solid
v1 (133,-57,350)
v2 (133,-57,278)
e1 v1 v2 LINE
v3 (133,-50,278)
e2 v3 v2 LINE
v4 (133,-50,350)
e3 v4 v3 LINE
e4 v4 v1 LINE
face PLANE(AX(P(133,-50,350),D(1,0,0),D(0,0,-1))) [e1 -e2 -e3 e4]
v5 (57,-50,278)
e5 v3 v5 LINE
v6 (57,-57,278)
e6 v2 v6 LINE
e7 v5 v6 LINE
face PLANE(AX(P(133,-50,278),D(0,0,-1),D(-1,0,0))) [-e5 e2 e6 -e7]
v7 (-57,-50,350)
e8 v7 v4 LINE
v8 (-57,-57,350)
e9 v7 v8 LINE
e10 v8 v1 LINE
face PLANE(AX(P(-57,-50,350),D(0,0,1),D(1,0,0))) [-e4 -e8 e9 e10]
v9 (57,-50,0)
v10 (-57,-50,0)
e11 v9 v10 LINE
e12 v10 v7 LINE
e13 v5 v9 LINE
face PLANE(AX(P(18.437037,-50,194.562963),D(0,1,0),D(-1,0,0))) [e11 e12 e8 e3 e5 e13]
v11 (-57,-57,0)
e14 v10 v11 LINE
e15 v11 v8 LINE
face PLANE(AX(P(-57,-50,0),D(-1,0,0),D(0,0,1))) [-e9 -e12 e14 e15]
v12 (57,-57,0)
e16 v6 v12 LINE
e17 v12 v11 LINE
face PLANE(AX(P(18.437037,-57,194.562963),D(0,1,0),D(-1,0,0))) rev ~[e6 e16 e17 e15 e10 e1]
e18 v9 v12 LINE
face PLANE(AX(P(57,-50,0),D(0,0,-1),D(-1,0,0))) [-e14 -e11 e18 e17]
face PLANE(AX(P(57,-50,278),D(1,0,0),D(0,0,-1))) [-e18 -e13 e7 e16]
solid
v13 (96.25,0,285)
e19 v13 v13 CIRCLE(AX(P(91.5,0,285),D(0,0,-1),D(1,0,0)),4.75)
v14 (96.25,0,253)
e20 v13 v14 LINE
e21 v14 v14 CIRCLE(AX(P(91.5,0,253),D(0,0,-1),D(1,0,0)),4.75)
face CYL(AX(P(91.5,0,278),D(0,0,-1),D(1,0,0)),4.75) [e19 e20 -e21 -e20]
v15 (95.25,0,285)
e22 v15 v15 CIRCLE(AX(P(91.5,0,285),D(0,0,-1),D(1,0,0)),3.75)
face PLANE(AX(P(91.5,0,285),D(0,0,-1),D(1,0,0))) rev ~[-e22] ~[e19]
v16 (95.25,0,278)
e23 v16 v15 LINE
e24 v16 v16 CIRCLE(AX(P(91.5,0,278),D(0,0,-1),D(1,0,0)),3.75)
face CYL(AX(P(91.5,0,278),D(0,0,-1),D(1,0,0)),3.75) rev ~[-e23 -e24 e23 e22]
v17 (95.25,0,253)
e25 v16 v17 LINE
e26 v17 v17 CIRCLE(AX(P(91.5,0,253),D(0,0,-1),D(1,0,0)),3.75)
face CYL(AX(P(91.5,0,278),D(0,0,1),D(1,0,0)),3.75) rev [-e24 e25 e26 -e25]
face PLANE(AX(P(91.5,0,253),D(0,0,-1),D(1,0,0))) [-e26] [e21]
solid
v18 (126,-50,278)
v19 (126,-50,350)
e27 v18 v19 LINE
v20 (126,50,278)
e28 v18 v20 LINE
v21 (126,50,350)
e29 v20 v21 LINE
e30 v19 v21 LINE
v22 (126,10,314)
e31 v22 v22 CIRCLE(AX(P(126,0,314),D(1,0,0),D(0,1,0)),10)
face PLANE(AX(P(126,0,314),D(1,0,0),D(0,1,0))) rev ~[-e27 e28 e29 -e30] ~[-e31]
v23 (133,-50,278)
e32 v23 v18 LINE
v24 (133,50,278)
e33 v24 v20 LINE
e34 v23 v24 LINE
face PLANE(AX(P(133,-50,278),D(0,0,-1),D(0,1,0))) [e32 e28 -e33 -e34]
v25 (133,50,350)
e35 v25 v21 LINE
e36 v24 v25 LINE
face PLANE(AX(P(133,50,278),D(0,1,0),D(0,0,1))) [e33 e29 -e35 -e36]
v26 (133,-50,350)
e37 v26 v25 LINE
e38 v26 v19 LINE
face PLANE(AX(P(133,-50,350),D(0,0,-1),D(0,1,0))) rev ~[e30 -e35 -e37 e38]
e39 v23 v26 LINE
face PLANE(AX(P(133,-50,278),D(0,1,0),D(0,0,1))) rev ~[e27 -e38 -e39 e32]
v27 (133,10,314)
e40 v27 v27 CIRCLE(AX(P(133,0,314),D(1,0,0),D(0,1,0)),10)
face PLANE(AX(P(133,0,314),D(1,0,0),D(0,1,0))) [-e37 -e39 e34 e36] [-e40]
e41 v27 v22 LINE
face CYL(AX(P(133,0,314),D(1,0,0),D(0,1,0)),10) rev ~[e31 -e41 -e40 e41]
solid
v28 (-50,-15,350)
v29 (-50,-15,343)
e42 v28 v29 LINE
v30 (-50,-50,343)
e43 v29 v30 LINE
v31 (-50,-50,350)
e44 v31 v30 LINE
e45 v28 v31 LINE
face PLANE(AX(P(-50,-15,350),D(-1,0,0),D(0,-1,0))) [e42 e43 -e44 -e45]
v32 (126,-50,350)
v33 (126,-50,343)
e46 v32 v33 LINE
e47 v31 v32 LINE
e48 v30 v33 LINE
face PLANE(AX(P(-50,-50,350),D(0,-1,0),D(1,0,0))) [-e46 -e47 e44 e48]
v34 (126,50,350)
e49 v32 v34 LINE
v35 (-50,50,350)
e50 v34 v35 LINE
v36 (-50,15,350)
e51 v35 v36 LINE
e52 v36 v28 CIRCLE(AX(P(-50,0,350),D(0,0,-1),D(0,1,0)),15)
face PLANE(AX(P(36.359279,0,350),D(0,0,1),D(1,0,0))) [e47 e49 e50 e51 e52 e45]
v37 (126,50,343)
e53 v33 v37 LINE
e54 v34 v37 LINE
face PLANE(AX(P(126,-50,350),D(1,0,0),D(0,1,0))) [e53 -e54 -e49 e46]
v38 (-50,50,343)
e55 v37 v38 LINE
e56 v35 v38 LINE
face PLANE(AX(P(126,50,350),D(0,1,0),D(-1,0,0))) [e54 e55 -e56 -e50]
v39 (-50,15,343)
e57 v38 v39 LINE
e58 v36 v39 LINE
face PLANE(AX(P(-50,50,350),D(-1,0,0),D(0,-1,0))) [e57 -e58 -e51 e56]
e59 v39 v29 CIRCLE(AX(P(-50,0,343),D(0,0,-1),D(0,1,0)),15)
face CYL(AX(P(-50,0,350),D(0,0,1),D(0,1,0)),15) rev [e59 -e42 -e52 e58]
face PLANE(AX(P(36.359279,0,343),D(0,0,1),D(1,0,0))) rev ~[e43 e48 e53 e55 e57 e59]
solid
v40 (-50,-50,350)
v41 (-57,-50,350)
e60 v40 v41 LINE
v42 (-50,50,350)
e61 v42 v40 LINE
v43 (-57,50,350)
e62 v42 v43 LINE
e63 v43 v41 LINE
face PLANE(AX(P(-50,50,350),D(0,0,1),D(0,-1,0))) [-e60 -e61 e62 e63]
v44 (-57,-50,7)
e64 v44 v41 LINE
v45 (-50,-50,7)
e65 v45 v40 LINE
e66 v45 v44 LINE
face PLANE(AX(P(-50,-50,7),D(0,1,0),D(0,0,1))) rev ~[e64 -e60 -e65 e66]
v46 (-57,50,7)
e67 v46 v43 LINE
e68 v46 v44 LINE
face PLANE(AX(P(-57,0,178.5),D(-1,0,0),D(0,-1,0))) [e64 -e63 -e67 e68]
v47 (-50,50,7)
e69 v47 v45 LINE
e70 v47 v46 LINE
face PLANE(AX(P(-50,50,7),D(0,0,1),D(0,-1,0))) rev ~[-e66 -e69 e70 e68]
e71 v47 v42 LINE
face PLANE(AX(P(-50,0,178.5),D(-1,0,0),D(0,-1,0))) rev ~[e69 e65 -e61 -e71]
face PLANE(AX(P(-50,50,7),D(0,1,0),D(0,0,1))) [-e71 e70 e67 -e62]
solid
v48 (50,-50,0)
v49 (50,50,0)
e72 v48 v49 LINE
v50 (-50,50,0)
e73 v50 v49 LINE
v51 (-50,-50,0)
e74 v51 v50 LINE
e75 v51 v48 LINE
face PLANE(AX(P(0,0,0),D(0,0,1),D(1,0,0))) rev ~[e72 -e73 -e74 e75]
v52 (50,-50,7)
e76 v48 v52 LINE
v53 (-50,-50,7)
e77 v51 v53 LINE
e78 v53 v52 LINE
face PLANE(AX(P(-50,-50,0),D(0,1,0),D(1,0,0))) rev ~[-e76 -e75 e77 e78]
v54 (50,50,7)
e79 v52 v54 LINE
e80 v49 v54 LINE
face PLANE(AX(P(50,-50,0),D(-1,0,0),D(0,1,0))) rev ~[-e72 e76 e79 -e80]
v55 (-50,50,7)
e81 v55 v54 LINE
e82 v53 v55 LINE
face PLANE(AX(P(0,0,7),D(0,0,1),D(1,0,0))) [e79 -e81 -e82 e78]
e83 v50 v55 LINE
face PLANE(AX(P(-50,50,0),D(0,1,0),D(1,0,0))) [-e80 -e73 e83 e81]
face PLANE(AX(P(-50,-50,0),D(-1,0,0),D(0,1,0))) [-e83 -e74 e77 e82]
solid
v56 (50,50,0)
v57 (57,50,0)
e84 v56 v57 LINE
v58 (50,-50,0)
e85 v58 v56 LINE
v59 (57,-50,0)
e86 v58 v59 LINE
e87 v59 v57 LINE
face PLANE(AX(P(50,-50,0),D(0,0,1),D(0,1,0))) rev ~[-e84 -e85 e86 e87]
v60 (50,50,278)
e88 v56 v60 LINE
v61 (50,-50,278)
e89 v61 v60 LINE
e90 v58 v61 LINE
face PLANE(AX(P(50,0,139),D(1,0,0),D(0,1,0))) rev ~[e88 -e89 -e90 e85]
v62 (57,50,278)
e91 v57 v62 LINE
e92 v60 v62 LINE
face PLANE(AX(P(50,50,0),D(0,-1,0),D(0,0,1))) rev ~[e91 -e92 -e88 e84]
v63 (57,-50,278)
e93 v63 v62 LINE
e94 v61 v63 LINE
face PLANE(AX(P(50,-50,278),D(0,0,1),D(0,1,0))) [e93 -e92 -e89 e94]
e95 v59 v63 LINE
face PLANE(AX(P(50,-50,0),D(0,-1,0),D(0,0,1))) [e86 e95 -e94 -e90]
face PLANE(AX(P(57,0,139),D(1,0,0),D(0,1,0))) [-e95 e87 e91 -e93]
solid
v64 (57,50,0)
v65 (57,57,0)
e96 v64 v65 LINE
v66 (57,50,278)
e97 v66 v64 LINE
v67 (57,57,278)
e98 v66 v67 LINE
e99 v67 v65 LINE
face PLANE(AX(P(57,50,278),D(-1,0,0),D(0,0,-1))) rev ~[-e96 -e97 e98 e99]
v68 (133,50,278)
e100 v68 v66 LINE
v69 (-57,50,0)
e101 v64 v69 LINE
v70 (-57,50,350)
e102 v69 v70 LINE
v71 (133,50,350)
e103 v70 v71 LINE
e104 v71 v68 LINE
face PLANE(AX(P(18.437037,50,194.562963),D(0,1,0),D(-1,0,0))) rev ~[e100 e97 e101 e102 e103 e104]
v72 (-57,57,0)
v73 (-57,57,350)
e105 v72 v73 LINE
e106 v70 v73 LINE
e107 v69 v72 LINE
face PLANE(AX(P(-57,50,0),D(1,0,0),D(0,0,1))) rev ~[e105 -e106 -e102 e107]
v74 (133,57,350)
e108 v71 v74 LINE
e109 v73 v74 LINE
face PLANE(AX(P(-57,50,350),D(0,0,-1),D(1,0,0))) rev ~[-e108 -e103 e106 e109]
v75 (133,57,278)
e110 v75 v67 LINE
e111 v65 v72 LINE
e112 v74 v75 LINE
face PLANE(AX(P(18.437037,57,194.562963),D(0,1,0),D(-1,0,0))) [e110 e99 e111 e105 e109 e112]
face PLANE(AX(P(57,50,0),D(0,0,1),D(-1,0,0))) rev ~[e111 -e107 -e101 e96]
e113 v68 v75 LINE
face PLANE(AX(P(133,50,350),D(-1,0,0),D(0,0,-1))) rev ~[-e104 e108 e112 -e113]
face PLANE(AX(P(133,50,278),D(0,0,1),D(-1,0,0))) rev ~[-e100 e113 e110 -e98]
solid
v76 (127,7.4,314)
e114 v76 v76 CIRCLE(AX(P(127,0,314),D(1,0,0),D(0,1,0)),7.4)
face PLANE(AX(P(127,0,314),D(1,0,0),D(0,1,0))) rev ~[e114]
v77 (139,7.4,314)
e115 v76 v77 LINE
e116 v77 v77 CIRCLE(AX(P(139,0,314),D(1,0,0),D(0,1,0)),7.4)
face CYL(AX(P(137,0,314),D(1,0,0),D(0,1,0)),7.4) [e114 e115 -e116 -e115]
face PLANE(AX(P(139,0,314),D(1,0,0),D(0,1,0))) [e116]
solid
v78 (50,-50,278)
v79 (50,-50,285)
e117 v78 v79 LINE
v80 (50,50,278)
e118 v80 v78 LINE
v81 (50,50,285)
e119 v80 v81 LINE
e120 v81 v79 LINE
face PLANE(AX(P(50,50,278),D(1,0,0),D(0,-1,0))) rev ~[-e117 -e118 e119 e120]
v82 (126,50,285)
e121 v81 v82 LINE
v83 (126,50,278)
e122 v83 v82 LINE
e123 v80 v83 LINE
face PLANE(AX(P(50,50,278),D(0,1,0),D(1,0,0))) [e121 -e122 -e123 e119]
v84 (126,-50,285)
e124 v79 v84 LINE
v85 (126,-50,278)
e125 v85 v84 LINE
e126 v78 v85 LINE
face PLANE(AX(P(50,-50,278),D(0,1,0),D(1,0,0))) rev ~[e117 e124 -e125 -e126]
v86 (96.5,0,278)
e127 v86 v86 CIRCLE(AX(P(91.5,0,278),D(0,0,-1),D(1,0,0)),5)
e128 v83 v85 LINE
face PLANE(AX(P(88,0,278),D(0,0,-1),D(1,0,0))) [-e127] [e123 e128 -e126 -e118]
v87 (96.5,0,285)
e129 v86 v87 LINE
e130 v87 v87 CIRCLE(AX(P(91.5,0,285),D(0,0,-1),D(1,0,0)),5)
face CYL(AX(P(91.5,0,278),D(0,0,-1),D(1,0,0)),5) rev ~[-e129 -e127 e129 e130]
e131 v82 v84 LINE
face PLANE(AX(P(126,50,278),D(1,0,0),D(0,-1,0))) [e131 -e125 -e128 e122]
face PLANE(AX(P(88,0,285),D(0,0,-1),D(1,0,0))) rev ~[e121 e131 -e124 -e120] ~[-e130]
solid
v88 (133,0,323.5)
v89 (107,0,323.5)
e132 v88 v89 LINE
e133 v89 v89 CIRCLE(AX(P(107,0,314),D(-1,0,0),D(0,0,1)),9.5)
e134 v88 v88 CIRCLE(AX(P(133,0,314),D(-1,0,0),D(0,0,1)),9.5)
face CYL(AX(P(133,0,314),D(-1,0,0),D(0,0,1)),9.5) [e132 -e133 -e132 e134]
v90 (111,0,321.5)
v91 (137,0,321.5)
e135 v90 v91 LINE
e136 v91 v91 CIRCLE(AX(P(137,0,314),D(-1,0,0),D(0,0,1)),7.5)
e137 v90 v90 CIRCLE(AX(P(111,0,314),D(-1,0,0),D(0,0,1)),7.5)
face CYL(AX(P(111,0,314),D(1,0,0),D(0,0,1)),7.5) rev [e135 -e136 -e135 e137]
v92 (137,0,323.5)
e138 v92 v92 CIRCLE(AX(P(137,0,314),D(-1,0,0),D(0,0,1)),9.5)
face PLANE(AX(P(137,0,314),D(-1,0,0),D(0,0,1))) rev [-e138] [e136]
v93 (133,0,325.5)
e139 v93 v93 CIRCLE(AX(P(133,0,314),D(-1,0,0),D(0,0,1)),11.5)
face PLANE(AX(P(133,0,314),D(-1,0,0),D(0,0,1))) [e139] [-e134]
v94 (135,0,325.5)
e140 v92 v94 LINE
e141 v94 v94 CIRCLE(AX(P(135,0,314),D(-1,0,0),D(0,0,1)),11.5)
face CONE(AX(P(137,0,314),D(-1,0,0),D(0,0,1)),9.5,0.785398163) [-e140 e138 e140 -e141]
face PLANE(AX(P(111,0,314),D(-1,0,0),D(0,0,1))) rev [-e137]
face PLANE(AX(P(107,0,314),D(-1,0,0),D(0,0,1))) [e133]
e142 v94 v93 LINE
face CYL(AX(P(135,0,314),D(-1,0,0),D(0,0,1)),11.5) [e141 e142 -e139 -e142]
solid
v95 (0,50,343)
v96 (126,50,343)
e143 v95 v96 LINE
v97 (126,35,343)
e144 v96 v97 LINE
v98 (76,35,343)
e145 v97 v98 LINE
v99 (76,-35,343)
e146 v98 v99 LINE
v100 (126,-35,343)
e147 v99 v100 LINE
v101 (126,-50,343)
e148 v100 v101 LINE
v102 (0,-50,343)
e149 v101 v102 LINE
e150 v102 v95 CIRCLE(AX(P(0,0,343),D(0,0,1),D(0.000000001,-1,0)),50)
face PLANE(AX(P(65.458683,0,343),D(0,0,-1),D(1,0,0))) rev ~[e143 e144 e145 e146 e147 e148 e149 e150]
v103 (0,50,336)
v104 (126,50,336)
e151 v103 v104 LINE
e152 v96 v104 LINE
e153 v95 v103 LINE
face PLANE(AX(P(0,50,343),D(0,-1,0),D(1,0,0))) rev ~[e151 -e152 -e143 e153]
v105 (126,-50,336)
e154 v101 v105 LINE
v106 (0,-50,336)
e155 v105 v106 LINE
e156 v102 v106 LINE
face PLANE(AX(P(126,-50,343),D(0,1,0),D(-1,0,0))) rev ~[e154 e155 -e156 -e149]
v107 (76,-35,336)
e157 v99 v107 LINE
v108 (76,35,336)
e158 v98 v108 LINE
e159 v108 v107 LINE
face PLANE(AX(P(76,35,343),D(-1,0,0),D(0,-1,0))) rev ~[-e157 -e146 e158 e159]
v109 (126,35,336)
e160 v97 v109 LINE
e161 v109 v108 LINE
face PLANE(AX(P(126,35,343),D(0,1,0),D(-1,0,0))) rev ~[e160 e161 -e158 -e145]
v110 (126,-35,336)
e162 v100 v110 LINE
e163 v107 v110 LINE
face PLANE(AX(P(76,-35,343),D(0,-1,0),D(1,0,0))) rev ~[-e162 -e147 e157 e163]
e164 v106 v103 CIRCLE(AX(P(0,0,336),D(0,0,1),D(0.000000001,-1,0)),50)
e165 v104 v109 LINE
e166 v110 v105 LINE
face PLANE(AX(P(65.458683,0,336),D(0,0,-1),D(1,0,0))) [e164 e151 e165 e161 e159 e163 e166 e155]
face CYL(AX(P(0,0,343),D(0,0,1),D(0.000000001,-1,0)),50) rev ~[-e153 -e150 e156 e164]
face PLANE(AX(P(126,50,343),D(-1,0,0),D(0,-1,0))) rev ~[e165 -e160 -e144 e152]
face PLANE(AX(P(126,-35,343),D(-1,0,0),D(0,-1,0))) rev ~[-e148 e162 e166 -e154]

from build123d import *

# Parameters (mm, degrees)
F0_W           = 100
F0_H           = 100
F1_DEPTH       = 7
F3_DEPTH       = 7
F4_START       = -100
F4_DEPTH       = 7
F5_W           = 100
F5_H           = 278
F6_DEPTH       = 7
F7_W           = 100
F7_H           = 343
F8_DEPTH       = 7
F9_W           = 100
F9_H           = 72
F9_R           = 10
F10_DEPTH      = 7
F12_DEPTH      = 7
F13_W          = 76
F13_H          = 100
F13_R          = 5
F14_DEPTH      = 7
F17_R          = 7.4
F18_DEPTH      = 2
F18_DEPTH_BACK = 10
F19_R          = 4.75
F19_R_2        = 3.75
F20_DEPTH      = 25
F20_DEPTH_BACK = 7
F22_DEPTH      = 7


with BuildPart() as f1:
    # F0 (on Top) → F1 (new body)
    with BuildSketch(Plane.XY):
        Rectangle(F0_W, F0_H)
    extrude(amount=F1_DEPTH)


with BuildPart() as f3:
    # F2 (on face) → F3 (new body)
    with BuildSketch(Plane(origin=(0, 50, 0), x_dir=(-1, 0, 0), z_dir=(0, 1, 0))):
        Polygon((-57, 278), (-57, 0), (57, 0), (57, 350), (-133, 350), (-133, 278), align=None)
    extrude(amount=F3_DEPTH)


with BuildPart() as f4:
    # F2 (on face) → F4 (new body)
    with BuildSketch(Plane(origin=(0, 50, 0), x_dir=(-1, 0, 0), z_dir=(0, 1, 0)).offset(F4_START)):
        Polygon((-57, 278), (-57, 0), (57, 0), (57, 350), (-133, 350), (-133, 278), align=None)
    extrude(amount=-F4_DEPTH)


with BuildPart() as f6:
    # F5 (on face) → F6 (new body)
    with BuildSketch(Plane.YZ.offset(50)):
        with Locations((0, 139)):
            Rectangle(F5_W, F5_H)
    extrude(amount=F6_DEPTH)


with BuildPart() as f8:
    # F7 (on face) → F8 (new body)
    with BuildSketch(Plane(origin=(-50, 0, 0), x_dir=(0, -1, 0), z_dir=(-1, 0, 0))):
        with Locations((0, 178.5)):
            Rectangle(F7_W, F7_H)
    extrude(amount=F8_DEPTH)


with BuildPart() as f10:
    # F9 (on face) → F10 (new body)
    with BuildSketch(Plane.YZ.offset(133)):
        with Locations((0, 314)):
            Rectangle(F9_W, F9_H)
        with Locations((0, 314)):
            Circle(F9_R, mode=Mode.SUBTRACT)
    extrude(amount=-F10_DEPTH)


with BuildPart() as f12:
    # F11 (on face) → F12 (new body)
    with BuildSketch(Plane.XY.offset(350)):
        with BuildLine():
            Line((-50, -15), (-50, -50))
            Line((-50, -50), (126, -50))
            Line((126, -50), (126, 50))
            Line((126, 50), (-50, 50))
            Line((-50, 50), (-50, 15))
            ThreePointArc((-50, 15), (-39.3933982822, 10.6066017178), (-35, 0))
            ThreePointArc((-35, 0), (-39.3933982822, -10.6066017178), (-50, -15))
        make_face()
    extrude(amount=-F12_DEPTH)


with BuildPart() as f14:
    # F13 (on face) → F14 (new body)
    with BuildSketch(Plane(origin=(0, 0, 278), x_dir=(1, 0, 0), z_dir=(0, 0, -1))):
        with Locations((88, 0)):
            Rectangle(F13_W, F13_H)
        with Locations((91.5, 0)):
            Circle(F13_R, mode=Mode.SUBTRACT)
    extrude(amount=-F14_DEPTH)


with BuildPart() as f16:
    # F15 (on Front) → F16 (revolve)
    with BuildSketch(Plane.XZ):
        Polygon((133, 325.5), (133, 323.5), (107, 323.5), (107, 314), (111, 314), (111, 321.5), (137, 321.5), (137, 323.5), (135, 325.5), align=None)
    revolve(axis=Axis((109, 0, 314), (-1, 0, 0)))


with BuildPart() as f18:
    # F17 (on face) → F18 (new body, two sides)
    with BuildSketch(Plane.YZ.offset(137)) as f18_sk:
        with Locations((0, 314)):
            Circle(F17_R)
    extrude(amount=F18_DEPTH)
    extrude(f18_sk.sketch, amount=-F18_DEPTH_BACK)


with BuildPart() as f20:
    # F19 (on face) → F20 (new body, two sides)
    with BuildSketch(Plane(origin=(0, 0, 278), x_dir=(1, 0, 0), z_dir=(0, 0, -1))) as f20_sk:
        with Locations((91.5, 0)):
            Circle(F19_R)
        with Locations((91.5, 0)):
            Circle(F19_R_2, mode=Mode.SUBTRACT)
    extrude(amount=F20_DEPTH)
    extrude(f20_sk.sketch, amount=-F20_DEPTH_BACK)


with BuildPart() as f22:
    # F21 (on face) → F22 (new body)
    with BuildSketch(Plane(origin=(0, 0, 343), x_dir=(1, 0, 0), z_dir=(0, 0, -1))):
        with BuildLine():
            ThreePointArc((50, 0), (35.3553390593, -35.3553390593), (0, -50))
            Line((0, -50), (126, -50))
            Line((126, -50), (126, -35))
            Line((126, -35), (76, -35))
            Line((76, -35), (76, 35))
            Line((76, 35), (126, 35))
            Line((126, 35), (126, 50))
            Line((126, 50), (3.1482449267, 50))
            Line((3.1482449267, 50), (6.44e-08, 50))
            ThreePointArc((6.44e-08, 50), (35.3553390821, 35.3553390366), (50, 0))
        make_face()
    extrude(amount=F22_DEPTH)


solid = Compound([f1.part, f3.part, f4.part, f6.part, f8.part, f10.part, f12.part, f14.part, f16.part, f18.part, f20.part, f22.part])
